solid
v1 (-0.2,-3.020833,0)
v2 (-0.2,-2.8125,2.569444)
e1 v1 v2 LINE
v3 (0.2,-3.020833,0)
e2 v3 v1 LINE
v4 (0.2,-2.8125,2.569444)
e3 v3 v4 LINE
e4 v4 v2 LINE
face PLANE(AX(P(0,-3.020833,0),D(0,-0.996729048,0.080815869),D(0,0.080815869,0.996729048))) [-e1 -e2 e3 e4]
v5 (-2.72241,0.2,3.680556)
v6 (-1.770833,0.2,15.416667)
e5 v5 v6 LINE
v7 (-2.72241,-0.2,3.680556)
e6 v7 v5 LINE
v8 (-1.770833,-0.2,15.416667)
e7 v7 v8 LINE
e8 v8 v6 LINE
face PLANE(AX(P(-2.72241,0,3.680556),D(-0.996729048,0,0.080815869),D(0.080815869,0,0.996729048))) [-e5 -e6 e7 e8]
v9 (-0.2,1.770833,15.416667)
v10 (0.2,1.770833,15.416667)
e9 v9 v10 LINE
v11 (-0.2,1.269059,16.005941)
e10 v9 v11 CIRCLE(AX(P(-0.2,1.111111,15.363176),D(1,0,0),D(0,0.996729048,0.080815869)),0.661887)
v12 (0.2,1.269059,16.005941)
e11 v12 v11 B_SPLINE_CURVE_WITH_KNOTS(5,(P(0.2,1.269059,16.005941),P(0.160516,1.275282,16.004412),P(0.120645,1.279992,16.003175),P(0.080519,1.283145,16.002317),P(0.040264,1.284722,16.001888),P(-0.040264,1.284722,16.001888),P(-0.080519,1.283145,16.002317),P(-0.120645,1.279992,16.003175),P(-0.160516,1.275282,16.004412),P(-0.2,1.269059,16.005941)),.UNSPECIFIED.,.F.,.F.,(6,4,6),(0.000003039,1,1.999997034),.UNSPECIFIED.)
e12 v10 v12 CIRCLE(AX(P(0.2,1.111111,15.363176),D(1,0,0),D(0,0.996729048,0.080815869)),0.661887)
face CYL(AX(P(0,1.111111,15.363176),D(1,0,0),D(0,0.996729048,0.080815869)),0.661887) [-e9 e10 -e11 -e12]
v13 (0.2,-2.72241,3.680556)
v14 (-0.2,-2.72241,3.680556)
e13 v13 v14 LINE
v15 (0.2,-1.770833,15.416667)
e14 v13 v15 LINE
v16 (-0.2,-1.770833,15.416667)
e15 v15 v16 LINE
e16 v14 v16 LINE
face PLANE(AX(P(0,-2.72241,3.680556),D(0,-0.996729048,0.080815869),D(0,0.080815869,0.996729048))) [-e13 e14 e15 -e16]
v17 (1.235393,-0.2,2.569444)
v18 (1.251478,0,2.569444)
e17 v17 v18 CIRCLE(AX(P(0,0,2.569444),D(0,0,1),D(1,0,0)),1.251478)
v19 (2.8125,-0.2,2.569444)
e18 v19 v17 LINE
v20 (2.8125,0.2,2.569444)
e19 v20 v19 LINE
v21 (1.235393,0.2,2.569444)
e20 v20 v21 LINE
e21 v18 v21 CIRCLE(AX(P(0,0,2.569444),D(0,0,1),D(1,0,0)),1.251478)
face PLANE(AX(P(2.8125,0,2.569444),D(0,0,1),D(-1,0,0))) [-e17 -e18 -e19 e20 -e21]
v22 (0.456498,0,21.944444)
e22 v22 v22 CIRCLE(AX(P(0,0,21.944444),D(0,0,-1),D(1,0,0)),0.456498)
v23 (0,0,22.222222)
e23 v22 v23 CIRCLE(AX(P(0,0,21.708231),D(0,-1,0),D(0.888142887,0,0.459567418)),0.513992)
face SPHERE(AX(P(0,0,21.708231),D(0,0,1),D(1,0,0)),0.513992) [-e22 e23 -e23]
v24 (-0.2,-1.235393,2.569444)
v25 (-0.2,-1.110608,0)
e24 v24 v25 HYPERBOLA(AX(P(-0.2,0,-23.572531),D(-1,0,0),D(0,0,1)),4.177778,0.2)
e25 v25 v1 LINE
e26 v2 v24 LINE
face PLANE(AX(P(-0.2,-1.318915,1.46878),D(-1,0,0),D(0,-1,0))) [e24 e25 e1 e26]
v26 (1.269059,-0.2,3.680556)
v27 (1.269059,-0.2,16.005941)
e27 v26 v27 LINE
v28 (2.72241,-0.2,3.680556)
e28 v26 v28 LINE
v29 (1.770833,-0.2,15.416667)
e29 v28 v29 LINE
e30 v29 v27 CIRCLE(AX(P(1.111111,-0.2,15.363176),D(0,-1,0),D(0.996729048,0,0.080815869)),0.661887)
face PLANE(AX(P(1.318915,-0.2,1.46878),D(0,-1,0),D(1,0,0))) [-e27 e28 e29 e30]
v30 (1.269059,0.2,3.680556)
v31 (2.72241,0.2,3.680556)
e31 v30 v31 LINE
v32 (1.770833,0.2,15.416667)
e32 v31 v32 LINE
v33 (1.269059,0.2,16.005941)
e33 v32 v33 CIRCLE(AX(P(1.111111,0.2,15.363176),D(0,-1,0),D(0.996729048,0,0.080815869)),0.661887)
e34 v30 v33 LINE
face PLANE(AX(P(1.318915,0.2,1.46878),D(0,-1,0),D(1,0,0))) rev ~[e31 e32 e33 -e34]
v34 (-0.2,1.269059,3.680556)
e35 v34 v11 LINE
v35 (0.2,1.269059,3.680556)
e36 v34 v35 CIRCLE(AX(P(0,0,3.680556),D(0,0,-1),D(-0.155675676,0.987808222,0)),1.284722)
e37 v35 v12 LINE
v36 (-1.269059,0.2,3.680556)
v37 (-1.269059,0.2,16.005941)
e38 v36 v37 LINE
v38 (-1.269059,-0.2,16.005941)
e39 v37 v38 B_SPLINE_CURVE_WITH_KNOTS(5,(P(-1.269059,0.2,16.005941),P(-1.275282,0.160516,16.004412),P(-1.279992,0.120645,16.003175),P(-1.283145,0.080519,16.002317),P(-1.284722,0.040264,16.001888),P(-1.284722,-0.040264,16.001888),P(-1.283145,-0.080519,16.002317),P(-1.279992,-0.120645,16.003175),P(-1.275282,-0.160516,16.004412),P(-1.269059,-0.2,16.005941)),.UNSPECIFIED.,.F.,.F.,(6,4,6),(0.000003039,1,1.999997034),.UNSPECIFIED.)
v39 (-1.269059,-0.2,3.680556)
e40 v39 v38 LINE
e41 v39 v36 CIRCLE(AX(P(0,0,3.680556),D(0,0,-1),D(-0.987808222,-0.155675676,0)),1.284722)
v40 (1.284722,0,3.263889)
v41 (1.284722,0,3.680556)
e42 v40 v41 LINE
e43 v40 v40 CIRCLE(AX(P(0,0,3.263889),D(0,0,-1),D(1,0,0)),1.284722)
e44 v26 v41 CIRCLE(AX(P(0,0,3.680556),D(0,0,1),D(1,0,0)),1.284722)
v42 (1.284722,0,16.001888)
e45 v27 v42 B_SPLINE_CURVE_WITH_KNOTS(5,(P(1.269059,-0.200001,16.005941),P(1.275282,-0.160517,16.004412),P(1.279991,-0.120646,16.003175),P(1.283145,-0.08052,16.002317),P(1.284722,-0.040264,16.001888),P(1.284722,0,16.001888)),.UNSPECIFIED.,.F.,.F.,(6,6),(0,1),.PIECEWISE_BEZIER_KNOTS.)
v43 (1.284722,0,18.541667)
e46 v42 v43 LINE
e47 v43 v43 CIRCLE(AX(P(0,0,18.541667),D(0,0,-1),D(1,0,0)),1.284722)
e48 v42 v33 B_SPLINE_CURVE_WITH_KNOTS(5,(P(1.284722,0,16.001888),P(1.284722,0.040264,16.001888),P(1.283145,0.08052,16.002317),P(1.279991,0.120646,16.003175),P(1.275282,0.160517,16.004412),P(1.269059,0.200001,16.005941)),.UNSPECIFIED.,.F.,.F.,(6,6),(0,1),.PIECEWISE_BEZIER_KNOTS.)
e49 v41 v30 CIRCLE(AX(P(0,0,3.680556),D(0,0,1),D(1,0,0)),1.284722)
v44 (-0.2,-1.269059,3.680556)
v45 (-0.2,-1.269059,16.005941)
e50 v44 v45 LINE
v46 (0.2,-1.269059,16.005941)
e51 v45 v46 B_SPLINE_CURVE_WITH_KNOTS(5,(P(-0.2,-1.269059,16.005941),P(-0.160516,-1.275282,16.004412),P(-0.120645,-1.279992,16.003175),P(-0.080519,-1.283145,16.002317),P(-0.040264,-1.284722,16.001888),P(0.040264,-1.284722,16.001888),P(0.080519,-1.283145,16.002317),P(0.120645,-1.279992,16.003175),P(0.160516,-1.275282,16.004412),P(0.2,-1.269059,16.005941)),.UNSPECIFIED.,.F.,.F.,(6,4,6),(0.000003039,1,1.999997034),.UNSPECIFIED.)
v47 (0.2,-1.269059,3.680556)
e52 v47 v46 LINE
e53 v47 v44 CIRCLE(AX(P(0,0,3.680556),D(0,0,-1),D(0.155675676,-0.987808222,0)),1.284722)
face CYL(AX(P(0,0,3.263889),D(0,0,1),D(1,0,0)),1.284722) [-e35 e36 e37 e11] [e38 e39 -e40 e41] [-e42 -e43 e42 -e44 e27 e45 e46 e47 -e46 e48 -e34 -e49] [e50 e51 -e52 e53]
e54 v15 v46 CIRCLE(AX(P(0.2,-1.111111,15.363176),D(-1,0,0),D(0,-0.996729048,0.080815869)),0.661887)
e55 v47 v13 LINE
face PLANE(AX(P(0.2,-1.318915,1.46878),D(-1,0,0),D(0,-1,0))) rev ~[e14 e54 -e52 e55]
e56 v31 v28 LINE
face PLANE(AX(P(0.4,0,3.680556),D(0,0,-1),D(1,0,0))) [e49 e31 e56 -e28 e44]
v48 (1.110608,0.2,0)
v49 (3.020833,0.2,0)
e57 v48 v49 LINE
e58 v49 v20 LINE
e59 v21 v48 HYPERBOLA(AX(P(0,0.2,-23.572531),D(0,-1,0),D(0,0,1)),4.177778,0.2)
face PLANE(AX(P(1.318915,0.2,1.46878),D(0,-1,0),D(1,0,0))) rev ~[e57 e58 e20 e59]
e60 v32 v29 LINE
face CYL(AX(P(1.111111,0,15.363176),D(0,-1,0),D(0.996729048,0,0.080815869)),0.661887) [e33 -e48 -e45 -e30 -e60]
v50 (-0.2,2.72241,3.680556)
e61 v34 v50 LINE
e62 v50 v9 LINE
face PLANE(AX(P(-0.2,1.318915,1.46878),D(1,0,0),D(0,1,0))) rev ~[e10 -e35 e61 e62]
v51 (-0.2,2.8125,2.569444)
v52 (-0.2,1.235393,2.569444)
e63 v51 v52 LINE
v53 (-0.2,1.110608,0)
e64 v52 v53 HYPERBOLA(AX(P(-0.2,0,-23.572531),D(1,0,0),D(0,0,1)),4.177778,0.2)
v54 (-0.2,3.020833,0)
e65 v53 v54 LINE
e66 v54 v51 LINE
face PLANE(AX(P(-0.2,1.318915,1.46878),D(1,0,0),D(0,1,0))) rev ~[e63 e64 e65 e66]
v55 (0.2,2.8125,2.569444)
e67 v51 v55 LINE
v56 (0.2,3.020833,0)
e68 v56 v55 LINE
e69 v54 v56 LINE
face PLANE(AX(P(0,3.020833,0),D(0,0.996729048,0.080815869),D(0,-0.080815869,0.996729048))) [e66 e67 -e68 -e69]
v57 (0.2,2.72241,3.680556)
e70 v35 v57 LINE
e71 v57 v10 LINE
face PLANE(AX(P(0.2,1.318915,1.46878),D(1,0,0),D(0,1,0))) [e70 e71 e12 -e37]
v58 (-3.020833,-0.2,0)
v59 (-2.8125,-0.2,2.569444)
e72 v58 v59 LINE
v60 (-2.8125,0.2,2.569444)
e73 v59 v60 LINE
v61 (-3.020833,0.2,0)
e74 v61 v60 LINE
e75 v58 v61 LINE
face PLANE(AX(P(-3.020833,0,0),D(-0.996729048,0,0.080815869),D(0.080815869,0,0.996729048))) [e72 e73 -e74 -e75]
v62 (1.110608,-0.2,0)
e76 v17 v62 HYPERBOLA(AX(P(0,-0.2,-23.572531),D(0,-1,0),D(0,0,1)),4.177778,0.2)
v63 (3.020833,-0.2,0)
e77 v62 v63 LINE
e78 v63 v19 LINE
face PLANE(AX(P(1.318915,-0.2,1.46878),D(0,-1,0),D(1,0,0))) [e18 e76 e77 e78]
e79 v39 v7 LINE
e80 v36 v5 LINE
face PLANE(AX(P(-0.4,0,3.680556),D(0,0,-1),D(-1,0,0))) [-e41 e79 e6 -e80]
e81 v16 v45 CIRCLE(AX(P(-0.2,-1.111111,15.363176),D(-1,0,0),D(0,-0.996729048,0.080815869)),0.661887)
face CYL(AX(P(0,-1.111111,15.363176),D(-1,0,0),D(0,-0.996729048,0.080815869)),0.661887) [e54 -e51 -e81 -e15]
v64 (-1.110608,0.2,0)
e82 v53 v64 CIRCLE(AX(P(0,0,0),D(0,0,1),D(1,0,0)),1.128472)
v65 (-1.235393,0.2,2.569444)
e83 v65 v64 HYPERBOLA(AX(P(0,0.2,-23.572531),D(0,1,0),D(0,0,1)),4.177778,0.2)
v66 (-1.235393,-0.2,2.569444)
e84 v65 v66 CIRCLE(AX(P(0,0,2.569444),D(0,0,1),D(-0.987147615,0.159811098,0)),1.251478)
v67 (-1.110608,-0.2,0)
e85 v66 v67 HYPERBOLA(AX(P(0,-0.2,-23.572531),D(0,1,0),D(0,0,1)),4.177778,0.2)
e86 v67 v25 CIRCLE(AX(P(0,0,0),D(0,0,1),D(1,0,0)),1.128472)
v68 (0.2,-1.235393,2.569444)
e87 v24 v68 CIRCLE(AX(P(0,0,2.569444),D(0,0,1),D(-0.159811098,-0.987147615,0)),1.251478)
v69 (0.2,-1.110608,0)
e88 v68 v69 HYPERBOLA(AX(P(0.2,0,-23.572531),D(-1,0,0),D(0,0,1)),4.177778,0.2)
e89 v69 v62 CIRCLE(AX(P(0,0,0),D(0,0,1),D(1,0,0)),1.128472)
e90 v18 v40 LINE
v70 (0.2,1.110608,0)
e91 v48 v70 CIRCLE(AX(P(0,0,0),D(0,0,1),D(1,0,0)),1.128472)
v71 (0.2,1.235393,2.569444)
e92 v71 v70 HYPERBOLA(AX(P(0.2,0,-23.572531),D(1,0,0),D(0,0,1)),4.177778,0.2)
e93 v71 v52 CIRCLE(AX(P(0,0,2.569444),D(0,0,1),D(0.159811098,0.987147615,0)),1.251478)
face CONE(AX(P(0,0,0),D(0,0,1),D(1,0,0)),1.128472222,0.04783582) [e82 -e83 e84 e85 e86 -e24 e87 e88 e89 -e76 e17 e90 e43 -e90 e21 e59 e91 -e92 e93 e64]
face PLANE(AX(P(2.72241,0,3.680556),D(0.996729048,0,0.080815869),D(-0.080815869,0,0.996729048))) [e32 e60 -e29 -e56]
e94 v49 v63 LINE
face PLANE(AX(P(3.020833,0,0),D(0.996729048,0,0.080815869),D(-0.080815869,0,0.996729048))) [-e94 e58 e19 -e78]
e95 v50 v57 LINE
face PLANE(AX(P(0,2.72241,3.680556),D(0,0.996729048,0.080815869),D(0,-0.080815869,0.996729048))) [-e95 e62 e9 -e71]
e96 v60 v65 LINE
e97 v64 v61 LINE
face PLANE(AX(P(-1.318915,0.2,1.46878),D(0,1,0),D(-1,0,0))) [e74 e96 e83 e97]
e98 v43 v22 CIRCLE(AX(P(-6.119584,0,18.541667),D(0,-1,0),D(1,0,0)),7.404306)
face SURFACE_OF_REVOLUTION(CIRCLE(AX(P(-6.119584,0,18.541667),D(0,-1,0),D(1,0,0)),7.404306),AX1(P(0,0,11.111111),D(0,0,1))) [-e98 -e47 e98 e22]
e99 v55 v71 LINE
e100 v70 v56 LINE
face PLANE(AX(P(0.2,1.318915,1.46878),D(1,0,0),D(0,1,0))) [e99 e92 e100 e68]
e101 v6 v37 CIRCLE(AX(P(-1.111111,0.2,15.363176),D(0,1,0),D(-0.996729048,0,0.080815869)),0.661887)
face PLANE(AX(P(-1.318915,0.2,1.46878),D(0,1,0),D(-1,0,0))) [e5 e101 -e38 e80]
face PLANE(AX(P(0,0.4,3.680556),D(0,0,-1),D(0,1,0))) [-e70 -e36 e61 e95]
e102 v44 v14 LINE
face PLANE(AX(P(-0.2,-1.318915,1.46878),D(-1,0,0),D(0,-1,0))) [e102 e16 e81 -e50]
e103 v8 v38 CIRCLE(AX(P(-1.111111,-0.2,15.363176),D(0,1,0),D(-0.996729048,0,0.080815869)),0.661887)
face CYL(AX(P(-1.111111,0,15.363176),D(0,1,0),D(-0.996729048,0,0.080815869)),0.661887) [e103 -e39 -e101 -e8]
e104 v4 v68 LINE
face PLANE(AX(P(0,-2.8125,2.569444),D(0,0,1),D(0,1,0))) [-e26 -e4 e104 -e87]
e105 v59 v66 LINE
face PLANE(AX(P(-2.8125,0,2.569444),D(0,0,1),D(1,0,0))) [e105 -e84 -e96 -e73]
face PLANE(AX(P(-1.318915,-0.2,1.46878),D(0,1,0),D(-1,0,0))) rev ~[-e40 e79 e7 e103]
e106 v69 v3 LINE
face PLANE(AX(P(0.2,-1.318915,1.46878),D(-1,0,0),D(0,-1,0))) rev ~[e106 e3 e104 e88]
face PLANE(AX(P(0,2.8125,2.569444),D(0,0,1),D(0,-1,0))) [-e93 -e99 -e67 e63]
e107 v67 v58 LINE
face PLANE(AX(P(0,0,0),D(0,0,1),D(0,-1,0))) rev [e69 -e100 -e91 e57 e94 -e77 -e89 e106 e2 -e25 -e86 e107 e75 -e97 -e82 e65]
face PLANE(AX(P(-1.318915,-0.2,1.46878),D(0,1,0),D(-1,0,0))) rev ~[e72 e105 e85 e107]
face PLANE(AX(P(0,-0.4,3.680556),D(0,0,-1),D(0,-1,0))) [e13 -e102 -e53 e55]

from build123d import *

# Parameters (mm, degrees)
F3_DEPTH = 0.2
F4_COUNT = 4


# Not quite as in the source:
# - a feature names something its author has since deleted; it is built from what else it names


with BuildPart() as f1:
    # F0 (on Front) → F1 (revolve)
    with BuildSketch(Plane.XZ):
        with BuildLine():
            Line((0, 22.2222222222), (0, 0))
            Line((0, 0), (1.1284722222, 0))
            Line((1.1284722222, 0), (1.2847222222, 3.2638888889))
            Line((1.2847222222, 3.2638888889), (1.2847222222, 18.5416666667))
            ThreePointArc((1.2847222222, 18.5416666667), (1.074687159, 20.2927272078), (0.4564979348, 21.9444444444))
            ThreePointArc((0.4564979348, 21.9444444444), (0.2671847948, 22.1473201826), (0, 22.2222222222))
        make_face()
    revolve(axis=Axis((0, 0, 11.1111111111), (0, 0, 1)))

    # F2 (on Front) → F3 (join, symmetric)
    with BuildSketch(Plane.XZ):
        Polygon((0, 3.2638888889), (0, 0), (3.0208333333, 0), (2.8125, 2.5694444444), (0.4, 2.5694444444), (0.4, 3.2638888889), align=None)
        with BuildLine():
            Line((0, 16.0250628992), (0, 3.2638888889))
            Line((0, 3.2638888889), (0.4, 3.2638888889))
            Line((0.4, 3.2638888889), (0.4, 3.6805555556))
            Line((0.4, 3.6805555556), (2.7224099099, 3.6805555556))
            Line((2.7224099099, 3.6805555556), (1.7708333333, 15.4166666667))
            ThreePointArc((1.7708333333, 15.4166666667), (1.5598257716, 15.8497451466), (1.1111111111, 16.0250628992))
            Line((1.1111111111, 16.0250628992), (0, 16.0250628992))
        make_face()
    extrude(amount=F3_DEPTH, both=True)

    # F4: F1 ×4 about axis
    f4_axis = Axis((0, 0, 3.2638888889), (0, 0, 1))


with BuildPart() as f1_1:
    add(f1.part)
    for i in range(1, F4_COUNT):
        add(f1.part.rotate(f4_axis, i * 360 / F4_COUNT))


solid = f1_1.part
